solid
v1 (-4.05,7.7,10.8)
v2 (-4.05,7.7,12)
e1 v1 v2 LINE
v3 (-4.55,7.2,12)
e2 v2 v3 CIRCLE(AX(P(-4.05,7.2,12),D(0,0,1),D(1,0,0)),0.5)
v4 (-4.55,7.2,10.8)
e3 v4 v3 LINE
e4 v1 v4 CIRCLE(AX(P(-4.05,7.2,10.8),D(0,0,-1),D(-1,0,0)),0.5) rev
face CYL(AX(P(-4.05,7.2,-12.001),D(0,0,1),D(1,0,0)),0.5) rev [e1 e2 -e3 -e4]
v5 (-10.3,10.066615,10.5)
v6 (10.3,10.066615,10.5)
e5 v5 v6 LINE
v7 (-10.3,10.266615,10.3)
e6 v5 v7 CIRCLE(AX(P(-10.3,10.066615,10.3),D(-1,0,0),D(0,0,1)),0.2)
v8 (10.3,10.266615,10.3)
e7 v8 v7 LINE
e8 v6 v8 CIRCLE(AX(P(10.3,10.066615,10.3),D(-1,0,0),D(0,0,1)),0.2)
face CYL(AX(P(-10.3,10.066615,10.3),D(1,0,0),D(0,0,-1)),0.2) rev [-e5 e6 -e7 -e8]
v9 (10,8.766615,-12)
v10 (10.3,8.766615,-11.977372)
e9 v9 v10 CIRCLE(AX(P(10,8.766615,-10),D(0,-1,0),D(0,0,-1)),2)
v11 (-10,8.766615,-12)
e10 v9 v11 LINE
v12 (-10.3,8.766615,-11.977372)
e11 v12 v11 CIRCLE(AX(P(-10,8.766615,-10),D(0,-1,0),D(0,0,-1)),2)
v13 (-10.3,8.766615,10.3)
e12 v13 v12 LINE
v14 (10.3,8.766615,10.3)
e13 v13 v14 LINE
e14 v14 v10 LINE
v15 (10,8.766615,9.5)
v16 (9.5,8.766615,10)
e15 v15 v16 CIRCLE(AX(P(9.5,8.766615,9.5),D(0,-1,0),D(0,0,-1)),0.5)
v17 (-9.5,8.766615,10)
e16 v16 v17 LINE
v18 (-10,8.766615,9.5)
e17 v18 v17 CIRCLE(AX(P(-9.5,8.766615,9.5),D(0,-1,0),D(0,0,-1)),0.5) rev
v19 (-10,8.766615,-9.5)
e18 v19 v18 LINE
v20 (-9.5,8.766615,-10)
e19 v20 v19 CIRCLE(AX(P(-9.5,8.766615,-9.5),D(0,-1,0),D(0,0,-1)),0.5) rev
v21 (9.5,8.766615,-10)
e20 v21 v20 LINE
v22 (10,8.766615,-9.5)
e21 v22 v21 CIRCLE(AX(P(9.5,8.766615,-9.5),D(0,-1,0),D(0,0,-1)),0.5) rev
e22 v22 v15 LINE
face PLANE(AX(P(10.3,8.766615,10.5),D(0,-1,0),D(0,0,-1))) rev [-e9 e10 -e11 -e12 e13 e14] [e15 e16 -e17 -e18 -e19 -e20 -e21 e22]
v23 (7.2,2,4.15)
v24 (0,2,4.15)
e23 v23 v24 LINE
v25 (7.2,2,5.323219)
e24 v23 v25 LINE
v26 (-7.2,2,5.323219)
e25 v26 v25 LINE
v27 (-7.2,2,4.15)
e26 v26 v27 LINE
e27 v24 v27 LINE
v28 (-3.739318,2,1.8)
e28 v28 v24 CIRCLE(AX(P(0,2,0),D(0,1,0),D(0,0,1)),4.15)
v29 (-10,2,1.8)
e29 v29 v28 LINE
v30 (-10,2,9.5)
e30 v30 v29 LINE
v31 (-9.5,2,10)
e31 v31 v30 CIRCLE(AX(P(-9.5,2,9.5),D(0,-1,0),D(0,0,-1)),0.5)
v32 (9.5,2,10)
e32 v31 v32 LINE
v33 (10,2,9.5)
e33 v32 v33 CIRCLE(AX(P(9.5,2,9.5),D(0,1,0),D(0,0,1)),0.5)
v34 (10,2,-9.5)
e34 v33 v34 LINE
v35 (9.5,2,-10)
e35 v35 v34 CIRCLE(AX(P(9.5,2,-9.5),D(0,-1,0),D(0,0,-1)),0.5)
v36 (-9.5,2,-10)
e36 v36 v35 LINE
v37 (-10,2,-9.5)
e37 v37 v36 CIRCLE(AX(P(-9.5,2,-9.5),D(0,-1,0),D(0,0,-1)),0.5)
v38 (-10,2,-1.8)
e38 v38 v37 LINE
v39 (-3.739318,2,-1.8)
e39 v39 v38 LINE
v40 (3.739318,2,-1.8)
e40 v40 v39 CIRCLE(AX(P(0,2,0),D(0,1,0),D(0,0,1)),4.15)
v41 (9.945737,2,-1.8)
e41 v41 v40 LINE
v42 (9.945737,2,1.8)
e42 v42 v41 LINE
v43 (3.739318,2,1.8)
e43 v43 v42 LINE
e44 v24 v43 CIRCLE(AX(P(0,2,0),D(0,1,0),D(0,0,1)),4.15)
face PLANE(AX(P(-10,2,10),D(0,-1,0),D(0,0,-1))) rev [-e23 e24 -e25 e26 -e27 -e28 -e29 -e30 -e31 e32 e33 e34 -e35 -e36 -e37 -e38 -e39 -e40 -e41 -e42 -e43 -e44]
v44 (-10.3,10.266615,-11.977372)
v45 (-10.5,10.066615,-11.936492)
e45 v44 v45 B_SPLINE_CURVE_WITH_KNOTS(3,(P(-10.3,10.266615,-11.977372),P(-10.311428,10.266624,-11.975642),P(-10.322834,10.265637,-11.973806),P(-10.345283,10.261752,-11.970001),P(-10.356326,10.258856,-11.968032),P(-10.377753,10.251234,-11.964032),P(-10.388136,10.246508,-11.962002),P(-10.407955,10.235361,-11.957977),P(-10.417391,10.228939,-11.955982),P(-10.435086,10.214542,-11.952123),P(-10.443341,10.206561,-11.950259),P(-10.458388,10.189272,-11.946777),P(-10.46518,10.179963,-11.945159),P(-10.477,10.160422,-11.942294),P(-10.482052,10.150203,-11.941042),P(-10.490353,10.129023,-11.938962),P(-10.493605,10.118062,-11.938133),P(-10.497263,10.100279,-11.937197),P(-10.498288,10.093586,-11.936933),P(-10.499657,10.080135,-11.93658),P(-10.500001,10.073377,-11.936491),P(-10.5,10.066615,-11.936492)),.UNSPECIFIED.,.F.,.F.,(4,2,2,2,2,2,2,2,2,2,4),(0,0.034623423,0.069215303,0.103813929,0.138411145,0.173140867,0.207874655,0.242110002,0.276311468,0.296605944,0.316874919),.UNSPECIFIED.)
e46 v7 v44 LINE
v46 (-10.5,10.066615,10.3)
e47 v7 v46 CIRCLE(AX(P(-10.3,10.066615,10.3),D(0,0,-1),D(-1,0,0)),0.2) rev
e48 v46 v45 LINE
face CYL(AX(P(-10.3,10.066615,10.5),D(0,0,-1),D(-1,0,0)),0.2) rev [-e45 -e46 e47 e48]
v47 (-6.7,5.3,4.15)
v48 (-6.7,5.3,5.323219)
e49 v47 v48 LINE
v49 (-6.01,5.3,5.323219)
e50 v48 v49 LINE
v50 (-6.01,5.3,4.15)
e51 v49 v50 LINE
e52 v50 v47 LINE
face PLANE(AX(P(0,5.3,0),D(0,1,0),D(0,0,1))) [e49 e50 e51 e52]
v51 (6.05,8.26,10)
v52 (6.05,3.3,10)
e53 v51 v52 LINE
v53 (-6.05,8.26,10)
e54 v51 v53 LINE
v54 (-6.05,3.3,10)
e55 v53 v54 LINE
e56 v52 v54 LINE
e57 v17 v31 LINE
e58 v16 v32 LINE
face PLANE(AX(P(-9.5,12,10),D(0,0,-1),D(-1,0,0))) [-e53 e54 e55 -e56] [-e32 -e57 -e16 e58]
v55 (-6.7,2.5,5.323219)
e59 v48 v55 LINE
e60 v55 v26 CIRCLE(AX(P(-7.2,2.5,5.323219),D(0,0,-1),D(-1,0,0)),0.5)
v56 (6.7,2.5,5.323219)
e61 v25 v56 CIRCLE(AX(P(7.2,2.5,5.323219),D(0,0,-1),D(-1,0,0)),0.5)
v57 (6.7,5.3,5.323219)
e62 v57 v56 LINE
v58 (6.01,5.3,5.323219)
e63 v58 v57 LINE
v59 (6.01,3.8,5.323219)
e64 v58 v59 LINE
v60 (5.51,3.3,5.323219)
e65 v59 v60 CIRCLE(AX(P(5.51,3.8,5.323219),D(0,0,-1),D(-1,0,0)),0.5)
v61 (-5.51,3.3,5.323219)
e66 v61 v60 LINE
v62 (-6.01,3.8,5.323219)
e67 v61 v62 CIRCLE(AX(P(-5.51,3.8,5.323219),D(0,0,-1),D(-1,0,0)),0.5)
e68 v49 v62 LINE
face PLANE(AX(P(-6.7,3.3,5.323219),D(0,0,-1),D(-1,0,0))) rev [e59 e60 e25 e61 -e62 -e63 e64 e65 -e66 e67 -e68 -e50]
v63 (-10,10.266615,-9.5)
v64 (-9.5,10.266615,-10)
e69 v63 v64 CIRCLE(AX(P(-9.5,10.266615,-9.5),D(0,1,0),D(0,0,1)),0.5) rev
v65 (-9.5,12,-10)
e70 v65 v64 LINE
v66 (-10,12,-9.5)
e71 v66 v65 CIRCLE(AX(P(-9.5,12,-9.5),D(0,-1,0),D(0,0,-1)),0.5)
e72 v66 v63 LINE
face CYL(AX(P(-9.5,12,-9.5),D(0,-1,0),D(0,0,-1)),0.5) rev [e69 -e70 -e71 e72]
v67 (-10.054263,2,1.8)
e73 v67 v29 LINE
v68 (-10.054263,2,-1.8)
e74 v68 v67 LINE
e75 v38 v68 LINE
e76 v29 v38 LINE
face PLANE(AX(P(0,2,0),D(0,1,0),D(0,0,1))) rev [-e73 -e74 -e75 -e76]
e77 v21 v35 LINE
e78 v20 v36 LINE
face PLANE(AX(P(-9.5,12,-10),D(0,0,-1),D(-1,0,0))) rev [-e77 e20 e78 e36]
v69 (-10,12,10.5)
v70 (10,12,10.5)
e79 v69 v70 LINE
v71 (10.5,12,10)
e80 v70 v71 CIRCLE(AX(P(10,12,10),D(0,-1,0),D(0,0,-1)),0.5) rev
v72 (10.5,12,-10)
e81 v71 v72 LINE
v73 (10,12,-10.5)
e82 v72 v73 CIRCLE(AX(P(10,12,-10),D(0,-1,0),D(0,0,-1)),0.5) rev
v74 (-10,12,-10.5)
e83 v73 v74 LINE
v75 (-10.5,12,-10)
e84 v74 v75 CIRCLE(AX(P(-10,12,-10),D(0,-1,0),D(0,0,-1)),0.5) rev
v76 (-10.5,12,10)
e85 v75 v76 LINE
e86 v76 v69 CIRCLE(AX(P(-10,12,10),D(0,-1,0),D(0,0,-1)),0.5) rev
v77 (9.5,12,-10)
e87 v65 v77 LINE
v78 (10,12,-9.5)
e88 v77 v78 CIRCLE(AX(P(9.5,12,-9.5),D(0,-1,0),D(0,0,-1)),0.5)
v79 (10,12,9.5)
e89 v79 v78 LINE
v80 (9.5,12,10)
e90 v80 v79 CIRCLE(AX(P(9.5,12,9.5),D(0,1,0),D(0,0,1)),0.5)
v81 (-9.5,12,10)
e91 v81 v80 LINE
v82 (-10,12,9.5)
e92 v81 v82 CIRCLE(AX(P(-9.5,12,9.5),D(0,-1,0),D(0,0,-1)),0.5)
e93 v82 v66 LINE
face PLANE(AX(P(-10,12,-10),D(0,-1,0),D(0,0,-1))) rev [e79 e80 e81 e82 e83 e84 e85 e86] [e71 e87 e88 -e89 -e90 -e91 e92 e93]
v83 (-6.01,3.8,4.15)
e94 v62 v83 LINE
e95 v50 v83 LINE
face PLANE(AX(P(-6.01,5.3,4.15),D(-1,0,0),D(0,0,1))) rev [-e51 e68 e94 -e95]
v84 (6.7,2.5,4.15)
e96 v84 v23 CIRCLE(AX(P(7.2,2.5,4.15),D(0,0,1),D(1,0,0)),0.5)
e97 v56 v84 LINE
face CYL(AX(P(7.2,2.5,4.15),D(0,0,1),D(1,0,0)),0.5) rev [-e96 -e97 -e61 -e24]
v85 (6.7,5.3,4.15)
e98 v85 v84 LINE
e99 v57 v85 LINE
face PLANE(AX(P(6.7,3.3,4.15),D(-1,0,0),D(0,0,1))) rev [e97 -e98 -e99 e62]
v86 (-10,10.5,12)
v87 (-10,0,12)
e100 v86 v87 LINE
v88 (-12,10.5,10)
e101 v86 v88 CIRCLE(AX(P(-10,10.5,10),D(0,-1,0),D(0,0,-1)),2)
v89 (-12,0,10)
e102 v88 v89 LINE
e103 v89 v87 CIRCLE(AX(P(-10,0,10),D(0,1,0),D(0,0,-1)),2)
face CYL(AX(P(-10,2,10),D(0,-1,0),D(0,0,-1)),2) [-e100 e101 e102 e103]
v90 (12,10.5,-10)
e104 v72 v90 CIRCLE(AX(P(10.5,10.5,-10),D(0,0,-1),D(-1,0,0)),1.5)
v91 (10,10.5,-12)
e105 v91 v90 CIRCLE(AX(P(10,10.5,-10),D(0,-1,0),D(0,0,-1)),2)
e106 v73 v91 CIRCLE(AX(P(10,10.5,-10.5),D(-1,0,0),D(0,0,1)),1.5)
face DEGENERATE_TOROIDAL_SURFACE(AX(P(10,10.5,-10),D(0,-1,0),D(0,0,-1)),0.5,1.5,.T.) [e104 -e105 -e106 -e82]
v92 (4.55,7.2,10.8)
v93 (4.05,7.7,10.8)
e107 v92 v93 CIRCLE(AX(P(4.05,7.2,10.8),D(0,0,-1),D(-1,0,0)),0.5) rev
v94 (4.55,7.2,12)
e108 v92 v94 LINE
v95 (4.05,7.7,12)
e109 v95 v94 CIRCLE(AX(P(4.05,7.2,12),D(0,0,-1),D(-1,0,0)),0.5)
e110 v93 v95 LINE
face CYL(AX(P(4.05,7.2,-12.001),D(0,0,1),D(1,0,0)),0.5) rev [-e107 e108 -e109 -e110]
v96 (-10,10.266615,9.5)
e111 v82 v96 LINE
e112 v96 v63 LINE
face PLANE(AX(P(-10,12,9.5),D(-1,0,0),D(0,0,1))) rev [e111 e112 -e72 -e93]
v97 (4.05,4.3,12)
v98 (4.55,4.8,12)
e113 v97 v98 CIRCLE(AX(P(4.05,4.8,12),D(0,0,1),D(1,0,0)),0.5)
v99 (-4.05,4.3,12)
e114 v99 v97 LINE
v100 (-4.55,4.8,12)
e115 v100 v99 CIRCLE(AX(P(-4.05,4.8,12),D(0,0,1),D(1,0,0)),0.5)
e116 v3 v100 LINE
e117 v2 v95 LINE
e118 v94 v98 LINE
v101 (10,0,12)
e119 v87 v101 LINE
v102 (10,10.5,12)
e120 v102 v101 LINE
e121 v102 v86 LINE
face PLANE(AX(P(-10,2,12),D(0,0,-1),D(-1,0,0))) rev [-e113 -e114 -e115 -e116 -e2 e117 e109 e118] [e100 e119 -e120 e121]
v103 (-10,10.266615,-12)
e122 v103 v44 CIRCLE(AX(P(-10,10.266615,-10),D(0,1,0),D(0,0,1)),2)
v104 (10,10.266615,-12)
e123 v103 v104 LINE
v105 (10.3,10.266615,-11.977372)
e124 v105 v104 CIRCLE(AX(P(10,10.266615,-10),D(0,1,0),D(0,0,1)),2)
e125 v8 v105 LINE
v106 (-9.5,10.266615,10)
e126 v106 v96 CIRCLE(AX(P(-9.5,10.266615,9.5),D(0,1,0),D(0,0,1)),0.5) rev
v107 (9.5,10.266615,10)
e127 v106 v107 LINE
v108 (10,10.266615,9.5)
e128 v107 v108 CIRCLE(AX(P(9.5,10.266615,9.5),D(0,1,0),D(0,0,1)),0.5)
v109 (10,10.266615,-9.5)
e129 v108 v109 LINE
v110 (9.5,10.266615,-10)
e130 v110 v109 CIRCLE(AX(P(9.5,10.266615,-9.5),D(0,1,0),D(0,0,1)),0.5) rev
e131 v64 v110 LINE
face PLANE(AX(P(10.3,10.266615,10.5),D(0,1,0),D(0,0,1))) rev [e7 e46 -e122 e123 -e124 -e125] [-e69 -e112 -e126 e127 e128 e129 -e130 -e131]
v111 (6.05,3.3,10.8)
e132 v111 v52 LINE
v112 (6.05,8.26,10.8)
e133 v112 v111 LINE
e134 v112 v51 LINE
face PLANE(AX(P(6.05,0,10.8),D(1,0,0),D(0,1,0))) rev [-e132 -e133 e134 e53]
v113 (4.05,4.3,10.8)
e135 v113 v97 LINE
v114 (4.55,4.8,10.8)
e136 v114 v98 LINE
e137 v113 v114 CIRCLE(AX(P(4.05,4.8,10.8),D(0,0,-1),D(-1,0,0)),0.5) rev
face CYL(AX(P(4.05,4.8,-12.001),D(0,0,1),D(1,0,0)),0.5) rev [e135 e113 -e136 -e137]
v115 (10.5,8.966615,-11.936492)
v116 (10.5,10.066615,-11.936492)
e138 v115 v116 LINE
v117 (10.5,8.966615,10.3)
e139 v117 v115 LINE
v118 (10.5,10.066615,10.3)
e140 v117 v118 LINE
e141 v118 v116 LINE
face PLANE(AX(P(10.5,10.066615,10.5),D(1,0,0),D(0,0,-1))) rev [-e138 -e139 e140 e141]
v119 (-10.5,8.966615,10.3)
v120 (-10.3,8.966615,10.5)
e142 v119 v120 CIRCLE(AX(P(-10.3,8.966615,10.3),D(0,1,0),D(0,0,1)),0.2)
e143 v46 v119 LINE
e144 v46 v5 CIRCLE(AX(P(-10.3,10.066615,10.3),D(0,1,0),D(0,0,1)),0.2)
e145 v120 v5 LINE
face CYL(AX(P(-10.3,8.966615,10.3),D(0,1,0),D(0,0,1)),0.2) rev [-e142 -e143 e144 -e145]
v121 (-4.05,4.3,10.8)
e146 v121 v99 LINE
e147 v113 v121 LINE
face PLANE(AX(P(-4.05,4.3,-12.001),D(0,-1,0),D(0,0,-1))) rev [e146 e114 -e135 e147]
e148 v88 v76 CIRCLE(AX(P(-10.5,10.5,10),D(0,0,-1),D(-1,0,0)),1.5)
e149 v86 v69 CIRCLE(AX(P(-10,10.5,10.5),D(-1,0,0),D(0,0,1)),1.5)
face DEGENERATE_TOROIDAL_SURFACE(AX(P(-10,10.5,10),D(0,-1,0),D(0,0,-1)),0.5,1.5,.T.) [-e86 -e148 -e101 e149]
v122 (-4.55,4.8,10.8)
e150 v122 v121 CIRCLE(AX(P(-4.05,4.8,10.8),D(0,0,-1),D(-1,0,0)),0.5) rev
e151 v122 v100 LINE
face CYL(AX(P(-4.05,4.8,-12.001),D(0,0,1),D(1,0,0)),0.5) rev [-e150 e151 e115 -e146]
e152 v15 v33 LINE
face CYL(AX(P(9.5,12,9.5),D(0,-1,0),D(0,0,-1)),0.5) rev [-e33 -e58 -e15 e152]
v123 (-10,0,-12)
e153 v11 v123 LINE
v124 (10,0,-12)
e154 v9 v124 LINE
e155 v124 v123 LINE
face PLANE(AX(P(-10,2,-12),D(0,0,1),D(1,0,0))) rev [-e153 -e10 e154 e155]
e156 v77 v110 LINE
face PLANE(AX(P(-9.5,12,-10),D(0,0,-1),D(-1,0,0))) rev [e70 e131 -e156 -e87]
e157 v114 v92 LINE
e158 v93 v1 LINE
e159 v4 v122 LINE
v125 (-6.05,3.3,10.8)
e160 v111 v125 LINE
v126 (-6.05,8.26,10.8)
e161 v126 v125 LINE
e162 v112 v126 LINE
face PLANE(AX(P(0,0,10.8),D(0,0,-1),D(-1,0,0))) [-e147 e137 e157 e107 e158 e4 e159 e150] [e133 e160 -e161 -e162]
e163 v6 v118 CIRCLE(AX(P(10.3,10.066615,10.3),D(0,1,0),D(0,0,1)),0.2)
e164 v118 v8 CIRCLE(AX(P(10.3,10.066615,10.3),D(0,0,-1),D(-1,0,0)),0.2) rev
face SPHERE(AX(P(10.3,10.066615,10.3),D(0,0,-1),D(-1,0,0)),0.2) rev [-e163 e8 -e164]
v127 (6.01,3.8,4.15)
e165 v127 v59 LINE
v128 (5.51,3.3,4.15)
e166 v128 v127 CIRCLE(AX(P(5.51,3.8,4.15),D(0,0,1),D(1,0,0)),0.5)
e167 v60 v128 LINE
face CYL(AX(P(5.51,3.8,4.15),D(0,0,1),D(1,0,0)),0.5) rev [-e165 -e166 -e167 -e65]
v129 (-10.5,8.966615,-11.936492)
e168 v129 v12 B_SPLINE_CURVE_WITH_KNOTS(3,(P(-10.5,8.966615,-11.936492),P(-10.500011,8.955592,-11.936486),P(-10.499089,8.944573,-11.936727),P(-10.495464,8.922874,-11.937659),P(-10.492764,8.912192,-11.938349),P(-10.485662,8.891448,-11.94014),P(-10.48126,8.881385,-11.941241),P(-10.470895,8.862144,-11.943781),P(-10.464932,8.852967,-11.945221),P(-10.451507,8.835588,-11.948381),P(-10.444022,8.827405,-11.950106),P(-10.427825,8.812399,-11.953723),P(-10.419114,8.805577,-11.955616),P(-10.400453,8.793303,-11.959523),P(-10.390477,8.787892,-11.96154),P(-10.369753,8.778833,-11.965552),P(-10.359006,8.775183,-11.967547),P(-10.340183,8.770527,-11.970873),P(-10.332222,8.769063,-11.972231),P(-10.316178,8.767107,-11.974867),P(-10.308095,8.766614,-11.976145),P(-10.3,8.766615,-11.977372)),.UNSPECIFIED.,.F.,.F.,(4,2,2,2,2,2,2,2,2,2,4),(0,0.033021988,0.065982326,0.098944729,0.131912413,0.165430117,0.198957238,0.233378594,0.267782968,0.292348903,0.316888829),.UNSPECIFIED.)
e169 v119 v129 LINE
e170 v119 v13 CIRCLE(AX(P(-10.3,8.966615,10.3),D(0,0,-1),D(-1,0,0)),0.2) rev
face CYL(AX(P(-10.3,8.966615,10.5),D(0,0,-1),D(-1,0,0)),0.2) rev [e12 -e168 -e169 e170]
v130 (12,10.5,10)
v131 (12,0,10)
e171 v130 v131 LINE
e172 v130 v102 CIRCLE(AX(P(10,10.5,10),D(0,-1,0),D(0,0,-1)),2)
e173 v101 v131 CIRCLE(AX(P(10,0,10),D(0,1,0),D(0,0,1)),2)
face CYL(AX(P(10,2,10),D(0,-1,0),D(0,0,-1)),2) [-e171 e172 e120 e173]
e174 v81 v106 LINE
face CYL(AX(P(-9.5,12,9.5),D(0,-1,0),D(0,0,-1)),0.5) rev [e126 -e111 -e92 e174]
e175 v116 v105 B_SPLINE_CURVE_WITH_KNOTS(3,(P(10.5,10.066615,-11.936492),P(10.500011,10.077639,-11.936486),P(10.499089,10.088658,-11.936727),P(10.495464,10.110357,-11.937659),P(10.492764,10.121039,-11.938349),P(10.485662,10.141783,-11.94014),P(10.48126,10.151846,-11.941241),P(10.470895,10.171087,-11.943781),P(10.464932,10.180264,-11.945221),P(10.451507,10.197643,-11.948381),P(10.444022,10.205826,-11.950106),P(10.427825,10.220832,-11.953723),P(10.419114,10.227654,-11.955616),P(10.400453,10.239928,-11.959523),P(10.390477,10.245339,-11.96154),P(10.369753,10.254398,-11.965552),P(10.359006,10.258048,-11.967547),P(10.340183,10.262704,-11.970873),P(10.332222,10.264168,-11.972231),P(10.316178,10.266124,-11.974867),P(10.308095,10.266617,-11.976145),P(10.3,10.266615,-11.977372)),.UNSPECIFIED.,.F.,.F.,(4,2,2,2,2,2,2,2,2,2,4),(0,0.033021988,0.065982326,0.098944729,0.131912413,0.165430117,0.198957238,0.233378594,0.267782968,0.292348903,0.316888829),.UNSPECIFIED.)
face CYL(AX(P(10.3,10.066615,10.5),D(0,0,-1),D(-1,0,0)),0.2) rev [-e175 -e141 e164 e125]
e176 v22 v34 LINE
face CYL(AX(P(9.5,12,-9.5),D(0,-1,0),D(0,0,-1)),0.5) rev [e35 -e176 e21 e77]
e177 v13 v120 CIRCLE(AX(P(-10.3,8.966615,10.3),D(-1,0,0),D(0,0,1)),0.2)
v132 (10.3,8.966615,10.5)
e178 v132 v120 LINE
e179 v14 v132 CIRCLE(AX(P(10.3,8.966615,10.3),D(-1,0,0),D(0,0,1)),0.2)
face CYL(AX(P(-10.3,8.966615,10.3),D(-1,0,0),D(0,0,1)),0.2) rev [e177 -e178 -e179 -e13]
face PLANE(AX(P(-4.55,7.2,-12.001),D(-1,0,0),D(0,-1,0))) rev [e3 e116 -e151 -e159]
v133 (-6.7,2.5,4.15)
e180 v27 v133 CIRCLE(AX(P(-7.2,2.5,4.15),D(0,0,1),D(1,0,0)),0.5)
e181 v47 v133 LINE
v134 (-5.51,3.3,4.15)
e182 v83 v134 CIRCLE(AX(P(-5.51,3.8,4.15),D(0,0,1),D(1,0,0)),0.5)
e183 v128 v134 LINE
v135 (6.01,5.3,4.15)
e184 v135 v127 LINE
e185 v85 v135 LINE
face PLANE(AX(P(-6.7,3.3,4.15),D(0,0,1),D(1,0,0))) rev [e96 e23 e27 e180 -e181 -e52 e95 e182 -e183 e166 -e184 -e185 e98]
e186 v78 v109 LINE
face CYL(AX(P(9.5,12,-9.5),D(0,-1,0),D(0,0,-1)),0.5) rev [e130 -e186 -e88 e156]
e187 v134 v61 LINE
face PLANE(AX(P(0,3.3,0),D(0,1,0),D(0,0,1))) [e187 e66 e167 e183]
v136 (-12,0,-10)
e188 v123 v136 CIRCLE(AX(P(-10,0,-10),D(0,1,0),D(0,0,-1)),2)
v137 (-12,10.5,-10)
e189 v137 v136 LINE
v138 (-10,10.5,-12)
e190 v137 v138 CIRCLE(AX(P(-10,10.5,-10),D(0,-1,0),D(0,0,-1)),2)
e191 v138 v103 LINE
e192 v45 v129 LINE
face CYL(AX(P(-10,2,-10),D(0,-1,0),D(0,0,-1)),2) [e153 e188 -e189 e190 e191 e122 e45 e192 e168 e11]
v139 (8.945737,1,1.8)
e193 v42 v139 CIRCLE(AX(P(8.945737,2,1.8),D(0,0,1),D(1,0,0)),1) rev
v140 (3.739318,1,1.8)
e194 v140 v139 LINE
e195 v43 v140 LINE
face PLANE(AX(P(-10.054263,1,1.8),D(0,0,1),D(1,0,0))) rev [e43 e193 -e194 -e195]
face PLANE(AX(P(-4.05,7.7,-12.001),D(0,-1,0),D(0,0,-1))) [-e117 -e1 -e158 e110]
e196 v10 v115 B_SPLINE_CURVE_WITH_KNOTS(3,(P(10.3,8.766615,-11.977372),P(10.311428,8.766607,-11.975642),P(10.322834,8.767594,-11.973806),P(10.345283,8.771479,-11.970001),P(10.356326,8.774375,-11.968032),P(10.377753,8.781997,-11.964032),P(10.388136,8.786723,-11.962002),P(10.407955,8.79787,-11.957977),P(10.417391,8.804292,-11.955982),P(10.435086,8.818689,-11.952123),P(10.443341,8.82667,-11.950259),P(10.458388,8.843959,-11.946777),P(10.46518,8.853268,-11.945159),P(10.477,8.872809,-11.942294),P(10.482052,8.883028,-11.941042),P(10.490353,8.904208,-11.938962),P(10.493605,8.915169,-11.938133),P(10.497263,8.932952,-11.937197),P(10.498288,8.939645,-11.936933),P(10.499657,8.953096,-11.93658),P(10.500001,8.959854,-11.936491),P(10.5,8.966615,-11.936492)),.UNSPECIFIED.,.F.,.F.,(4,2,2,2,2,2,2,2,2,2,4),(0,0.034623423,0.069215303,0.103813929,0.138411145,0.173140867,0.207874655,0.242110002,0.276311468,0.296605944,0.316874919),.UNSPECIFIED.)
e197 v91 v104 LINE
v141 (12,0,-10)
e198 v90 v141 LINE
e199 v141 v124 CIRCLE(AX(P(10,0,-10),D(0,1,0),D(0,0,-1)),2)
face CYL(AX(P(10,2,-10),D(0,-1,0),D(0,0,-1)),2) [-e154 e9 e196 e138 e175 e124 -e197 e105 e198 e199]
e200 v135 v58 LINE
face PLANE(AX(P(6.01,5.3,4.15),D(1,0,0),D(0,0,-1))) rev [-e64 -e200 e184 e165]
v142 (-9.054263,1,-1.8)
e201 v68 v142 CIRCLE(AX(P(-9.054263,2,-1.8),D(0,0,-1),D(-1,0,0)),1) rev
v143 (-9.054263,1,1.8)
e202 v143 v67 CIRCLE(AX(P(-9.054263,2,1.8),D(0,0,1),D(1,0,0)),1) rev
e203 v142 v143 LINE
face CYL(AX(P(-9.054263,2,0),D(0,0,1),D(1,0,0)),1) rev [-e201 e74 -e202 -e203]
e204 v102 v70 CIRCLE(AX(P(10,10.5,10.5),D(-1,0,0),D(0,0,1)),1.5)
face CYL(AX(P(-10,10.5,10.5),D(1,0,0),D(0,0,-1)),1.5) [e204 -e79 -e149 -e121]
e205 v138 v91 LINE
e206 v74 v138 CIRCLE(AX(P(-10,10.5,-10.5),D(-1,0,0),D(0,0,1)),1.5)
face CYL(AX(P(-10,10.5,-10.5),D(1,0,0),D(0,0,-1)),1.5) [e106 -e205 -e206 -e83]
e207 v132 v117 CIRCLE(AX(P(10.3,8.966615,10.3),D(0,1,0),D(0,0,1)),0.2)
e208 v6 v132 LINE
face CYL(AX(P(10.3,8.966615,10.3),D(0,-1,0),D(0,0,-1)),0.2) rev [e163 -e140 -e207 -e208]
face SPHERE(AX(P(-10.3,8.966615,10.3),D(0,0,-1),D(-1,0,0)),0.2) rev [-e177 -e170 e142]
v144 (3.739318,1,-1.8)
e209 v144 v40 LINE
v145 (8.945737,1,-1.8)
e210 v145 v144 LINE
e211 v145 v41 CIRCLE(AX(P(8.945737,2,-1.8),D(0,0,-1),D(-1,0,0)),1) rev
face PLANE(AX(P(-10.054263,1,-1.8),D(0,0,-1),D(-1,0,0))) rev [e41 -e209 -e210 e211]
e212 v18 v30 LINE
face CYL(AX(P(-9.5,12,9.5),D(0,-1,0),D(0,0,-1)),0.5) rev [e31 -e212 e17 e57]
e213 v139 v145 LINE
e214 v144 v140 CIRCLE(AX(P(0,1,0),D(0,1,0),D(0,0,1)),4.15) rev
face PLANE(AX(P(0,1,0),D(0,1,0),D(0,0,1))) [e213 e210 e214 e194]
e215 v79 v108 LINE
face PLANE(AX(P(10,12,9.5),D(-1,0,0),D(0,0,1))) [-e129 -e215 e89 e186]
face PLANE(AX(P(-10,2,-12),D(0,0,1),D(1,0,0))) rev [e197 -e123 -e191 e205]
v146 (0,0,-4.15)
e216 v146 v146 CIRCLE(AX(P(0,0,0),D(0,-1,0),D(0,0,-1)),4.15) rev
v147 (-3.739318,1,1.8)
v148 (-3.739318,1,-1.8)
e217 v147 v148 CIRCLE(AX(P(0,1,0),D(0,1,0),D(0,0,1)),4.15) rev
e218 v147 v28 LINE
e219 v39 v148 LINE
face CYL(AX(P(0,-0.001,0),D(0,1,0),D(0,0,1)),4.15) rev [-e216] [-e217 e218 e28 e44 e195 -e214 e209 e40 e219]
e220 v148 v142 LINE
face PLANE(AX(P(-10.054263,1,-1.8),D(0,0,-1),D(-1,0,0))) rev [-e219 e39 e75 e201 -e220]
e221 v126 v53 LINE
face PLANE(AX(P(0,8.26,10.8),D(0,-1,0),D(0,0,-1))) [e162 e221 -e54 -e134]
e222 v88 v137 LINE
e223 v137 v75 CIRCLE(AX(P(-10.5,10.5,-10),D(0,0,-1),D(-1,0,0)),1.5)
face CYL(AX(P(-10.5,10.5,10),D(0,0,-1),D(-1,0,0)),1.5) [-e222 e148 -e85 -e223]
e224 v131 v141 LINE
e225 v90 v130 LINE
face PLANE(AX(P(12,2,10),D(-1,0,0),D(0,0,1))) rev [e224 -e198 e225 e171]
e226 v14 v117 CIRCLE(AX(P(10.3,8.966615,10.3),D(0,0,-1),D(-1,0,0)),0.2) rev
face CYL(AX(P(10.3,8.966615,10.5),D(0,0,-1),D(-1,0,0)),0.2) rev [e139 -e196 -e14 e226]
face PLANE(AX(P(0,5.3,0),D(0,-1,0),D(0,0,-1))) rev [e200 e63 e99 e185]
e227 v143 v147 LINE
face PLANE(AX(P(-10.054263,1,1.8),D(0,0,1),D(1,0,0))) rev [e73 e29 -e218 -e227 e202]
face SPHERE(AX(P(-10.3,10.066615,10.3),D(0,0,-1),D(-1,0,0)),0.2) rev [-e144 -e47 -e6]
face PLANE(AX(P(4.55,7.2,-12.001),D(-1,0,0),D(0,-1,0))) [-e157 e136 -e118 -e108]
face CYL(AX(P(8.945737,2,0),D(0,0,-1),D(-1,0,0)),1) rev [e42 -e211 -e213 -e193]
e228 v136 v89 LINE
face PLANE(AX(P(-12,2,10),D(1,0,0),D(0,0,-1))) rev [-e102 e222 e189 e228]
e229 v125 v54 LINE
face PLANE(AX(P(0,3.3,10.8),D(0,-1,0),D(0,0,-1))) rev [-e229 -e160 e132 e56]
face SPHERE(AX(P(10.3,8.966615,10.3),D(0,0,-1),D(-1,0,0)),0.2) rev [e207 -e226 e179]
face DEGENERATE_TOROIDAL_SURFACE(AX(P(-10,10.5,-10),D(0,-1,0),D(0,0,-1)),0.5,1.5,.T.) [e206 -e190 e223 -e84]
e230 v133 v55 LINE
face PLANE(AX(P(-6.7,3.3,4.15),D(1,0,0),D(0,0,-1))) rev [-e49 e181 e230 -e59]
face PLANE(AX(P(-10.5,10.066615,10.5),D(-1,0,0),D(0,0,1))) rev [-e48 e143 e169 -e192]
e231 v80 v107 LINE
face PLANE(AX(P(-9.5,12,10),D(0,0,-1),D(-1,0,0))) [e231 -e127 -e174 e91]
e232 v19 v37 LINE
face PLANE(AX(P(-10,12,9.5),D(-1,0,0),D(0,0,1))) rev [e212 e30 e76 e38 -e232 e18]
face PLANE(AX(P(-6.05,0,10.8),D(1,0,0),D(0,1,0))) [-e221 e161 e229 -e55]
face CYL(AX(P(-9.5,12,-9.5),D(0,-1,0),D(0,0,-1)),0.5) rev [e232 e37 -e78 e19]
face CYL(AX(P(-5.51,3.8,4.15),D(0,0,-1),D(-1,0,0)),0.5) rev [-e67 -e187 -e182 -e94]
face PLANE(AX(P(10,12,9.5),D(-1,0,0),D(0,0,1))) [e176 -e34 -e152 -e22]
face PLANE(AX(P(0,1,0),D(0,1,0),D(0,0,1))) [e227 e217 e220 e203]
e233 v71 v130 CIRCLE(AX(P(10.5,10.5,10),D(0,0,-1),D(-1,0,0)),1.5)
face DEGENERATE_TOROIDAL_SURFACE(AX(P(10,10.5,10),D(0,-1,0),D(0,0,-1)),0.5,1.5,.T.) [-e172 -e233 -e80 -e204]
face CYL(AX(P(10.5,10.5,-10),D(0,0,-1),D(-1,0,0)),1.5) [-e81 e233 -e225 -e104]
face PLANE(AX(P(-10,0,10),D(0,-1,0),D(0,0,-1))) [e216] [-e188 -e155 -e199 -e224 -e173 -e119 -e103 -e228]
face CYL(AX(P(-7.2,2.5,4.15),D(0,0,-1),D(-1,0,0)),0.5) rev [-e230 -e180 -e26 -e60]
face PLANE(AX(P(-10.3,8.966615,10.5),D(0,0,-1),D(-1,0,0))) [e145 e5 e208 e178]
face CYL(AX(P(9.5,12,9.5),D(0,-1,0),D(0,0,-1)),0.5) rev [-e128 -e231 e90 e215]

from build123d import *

# Parameters (mm, degrees)
BOSS_EXTRUDE2_DEPTH = 2
BOSS_EXTRUDE3_DEPTH = 10
CUT_EXTRUDE1_REACH  = 31.394
CUT_EXTRUDE2_REACH  = 21.698
SKETCH5_R           = 4.15
SKETCH6_W           = 20
SKETCH6_H           = 3.6
CUT_EXTRUDE3_DEPTH  = 1
FILLET1_R           = 1
CUT_EXTRUDE4_START  = -0.8
CUT_EXTRUDE4_DEPTH  = 0.8
SKETCH8_W           = 13.4
SKETCH8_H           = 1.173218526
BOSS_EXTRUDE4_DEPTH = 1.3
SKETCH10_W          = 0.69
SKETCH10_H          = 1.173218526
BOSS_EXTRUDE5_DEPTH = 2
FILLET2_R           = 0.5
FILLET6_R           = 0.5
FILLET8_R           = 1.5
CUT_EXTRUDE6_DEPTH  = 22.5
FILLET9_R           = 0.2


with BuildPart() as part:
    # Sketch2 → Boss-Extrude2 (new body)
    with BuildSketch(Plane(origin=(0, 0, 0), x_dir=(1, 0, 0), z_dir=(0, 1, 0))):
        with BuildLine():
            Line((-10, -12), (10, -12))
            ThreePointArc((10, -12), (11.414213562, -11.414213562), (12, -10))
            Line((12, -10), (12, 10))
            ThreePointArc((12, 10), (11.414213562, 11.414213562), (10, 12))
            Line((10, 12), (-10, 12))
            ThreePointArc((-10, 12), (-11.414213562, 11.414213562), (-12, 10))
            Line((-12, 10), (-12, -10))
            ThreePointArc((-12, -10), (-11.414213562, -11.414213562), (-10, -12))
        make_face()
    extrude(amount=BOSS_EXTRUDE2_DEPTH)

    # Sketch3 → Boss-Extrude3 (add)
    with BuildSketch(Plane(origin=(0, 2, 0), x_dir=(1, 0, 0), z_dir=(0, 1, 0))):
        with BuildLine():
            Line((-10, -12), (10, -12))
            ThreePointArc((10, -12), (11.414213562, -11.414213562), (12, -10))
            Line((12, -10), (12, 10))
            ThreePointArc((12, 10), (11.414213562, 11.414213562), (10, 12))
            Line((10, 12), (-10, 12))
            ThreePointArc((-10, 12), (-11.414213562, 11.414213562), (-12, 10))
            Line((-12, 10), (-12, -10))
            ThreePointArc((-12, -10), (-11.414213562, -11.414213562), (-10, -12))
        make_face()
        with BuildLine():
            Line((-9.5, -10), (9.5, -10))
            ThreePointArc((9.5, -10), (9.853553391, -9.853553391), (10, -9.5))
            Line((10, -9.5), (10, 9.5))
            ThreePointArc((10, 9.5), (9.853553391, 9.853553391), (9.5, 10))
            Line((9.5, 10), (-9.5, 10))
            ThreePointArc((-9.5, 10), (-9.853553391, 9.853553391), (-10, 9.5))
            Line((-10, 9.5), (-10, -9.5))
            ThreePointArc((-10, -9.5), (-9.853553391, -9.853553391), (-9.5, -10))
        make_face(mode=Mode.SUBTRACT)
    extrude(amount=BOSS_EXTRUDE3_DEPTH)

    # Sketch4 → Cut-Extrude1 (cut, up to next)
    with BuildSketch(Plane.XY.offset(12), mode=Mode.PRIVATE) as cut_extrude1_sk1:
        with BuildLine():
            Line((-4.05, 7.7), (4.05, 7.7))
            ThreePointArc((4.05, 7.7), (4.403553391, 7.553553391), (4.55, 7.2))
            Line((4.55, 7.2), (4.55, 4.8))
            ThreePointArc((4.55, 4.8), (4.403553391, 4.446446609), (4.05, 4.3))
            Line((4.05, 4.3), (-4.05, 4.3))
            ThreePointArc((-4.05, 4.3), (-4.403553391, 4.446446609), (-4.55, 4.8))
            Line((-4.55, 4.8), (-4.55, 7.2))
            ThreePointArc((-4.55, 7.2), (-4.403553391, 7.553553391), (-4.05, 7.7))
        make_face()
    cut_extrude1_tool1 = extrude(cut_extrude1_sk1.sketch, amount=-CUT_EXTRUDE1_REACH, mode=Mode.PRIVATE) & part.part
    add(cut_extrude1_tool1.solids().sort_by_distance((0, 6, 12))[0], mode=Mode.SUBTRACT)

    # Sketch5 → Cut-Extrude2 (cut, up to next)
    with BuildSketch(Plane(origin=(0, 2, 0), x_dir=(1, 0, 0), z_dir=(0, 1, 0)), mode=Mode.PRIVATE) as cut_extrude2_sk1:
        with Locations(Location((0, 0, 0), (0, 0, 270))):
            Circle(SKETCH5_R)
    cut_extrude2_tool1 = extrude(cut_extrude2_sk1.sketch, amount=-CUT_EXTRUDE2_REACH, mode=Mode.PRIVATE) & part.part
    add(cut_extrude2_tool1.solids().sort_by_distance((0, 2, 0))[0], mode=Mode.SUBTRACT)

    # Sketch6 → Cut-Extrude3 (cut)
    with BuildSketch(Plane(origin=(0, 2, 0), x_dir=(1, 0, 0), z_dir=(0, 1, 0))):
        with Locations((-0.054263112, 0)):
            Rectangle(SKETCH6_W, SKETCH6_H)
    extrude(amount=-CUT_EXTRUDE3_DEPTH, mode=Mode.SUBTRACT)

    # Fillet1
    fillet1_edges = [part.edges().sort_by_distance(p)[0] for p in [
        (9.945736888, 1, 0),
        (-10.054263112, 1, 0),
    ]]
    fillet(fillet1_edges, radius=FILLET1_R - 0.0001)  # a hair under: the kernel refuses the full size

    # Sketch7 → Cut-Extrude4 (cut)
    with BuildSketch(Plane(origin=(0, 0, 10), x_dir=(-1, 0, 0), z_dir=(0, 0, -1)).offset(CUT_EXTRUDE4_START)):
        with BuildLine():
            Line((-6.05, 8.26), (-6.05, 4.3))
            Line((-6.05, 4.3), (-4.05, 4.3))
            ThreePointArc((-4.05, 4.3), (-4.403553391, 4.446446609), (-4.55, 4.8))
            Line((-4.55, 4.8), (-4.55, 7.2))
            ThreePointArc((-4.55, 7.2), (-4.403553391, 7.553553391), (-4.05, 7.7))
            Line((-4.05, 7.7), (4.05, 7.7))
            ThreePointArc((4.05, 7.7), (4.403553391, 7.553553391), (4.55, 7.2))
            Line((4.55, 7.2), (4.55, 4.8))
            ThreePointArc((4.55, 4.8), (4.403553391, 4.446446609), (4.05, 4.3))
            Line((4.05, 4.3), (6.05, 4.3))
            Line((6.05, 4.3), (6.05, 8.26))
            Line((6.05, 8.26), (-6.05, 8.26))
        make_face()
        Polygon((-6.05, 4.3), (-6.05, 3.3), (6.05, 3.3), (6.05, 4.3), (4.05, 4.3), (-4.05, 4.3), align=None)
    extrude(amount=CUT_EXTRUDE4_DEPTH, mode=Mode.SUBTRACT)

    # Sketch8 → Boss-Extrude4 (add)
    with BuildSketch(Plane(origin=(0, 2, 0), x_dir=(1, 0, 0), z_dir=(0, 1, 0))):
        with Locations((0, -4.736609263)):
            Rectangle(SKETCH8_W, SKETCH8_H)
    extrude(amount=BOSS_EXTRUDE4_DEPTH)

    # Sketch10 → Boss-Extrude5 (add)
    with BuildSketch(Plane(origin=(0, 3.3, 0), x_dir=(1, 0, 0), z_dir=(0, 1, 0))):
        with Locations((6.355, -4.736609263)):
            Rectangle(SKETCH10_W, SKETCH10_H)
        with Locations((-6.355, -4.736609263)):
            Rectangle(SKETCH10_W, SKETCH10_H)
    extrude(amount=BOSS_EXTRUDE5_DEPTH)

    # Fillet2
    fillet2_edges = [part.edges().sort_by_distance(p)[0] for p in [
        (-6.01, 3.3, 4.736609263),
        (6.01, 3.3, 4.736609263),
    ]]
    fillet(fillet2_edges, radius=FILLET2_R)

    # Fillet6
    fillet6_edges = [part.edges().sort_by_distance(p)[0] for p in [
        (6.7, 2, 4.736609263),
        (-6.7, 2, 4.736609263),
    ]]
    fillet(fillet6_edges, radius=FILLET6_R)

    # Fillet8
    fillet8_edges = [part.edges().sort_by_distance(p)[0] for p in [
        (-12, 12, 0),
        (-11.414213562, 12, 11.414213562),
        (11.414213562, 12, -11.414213562),
        (0, 12, -12),
        (-11.414213562, 12, -11.414213562),
        (0, 12, 12),
        (11.414213562, 12, 11.414213562),
        (12, 12, 0),
    ]]
    fillet(fillet8_edges, radius=FILLET8_R)

    # Sketch21 → Cut-Extrude6 (cut)
    with BuildSketch(Plane(origin=(0, 0, -12), x_dir=(-1, 0, 0), z_dir=(0, 0, -1))):
        with BuildLine():
            Line((-10.3, 10.26661549), (10.3, 10.26661549))
            ThreePointArc((10.3, 10.26661549), (10.441421356, 10.208036847), (10.5, 10.06661549))
            Line((10.5, 10.06661549), (10.5, 8.96661549))
            ThreePointArc((10.5, 8.96661549), (10.441421356, 8.825194134), (10.3, 8.76661549))
            Line((10.3, 8.76661549), (-10.3, 8.76661549))
            ThreePointArc((-10.3, 8.76661549), (-10.441421356, 8.825194134), (-10.5, 8.96661549))
            Line((-10.5, 8.96661549), (-10.5, 10.06661549))
            ThreePointArc((-10.5, 10.06661549), (-10.441421356, 10.208036847), (-10.3, 10.26661549))
        make_face()
    extrude(amount=-CUT_EXTRUDE6_DEPTH, mode=Mode.SUBTRACT)

    # Fillet9
    fillet9_edges = [part.edges().sort_by_distance(p)[0] for p in [
        (10.441421356, 8.825194134, 10.5),
        (10.5, 9.51661549, 10.5),
        (10.441421356, 10.208036847, 10.5),
        (-10.441421356, 8.825194134, 10.5),
        (-10.441421356, 10.208036847, 10.5),
        (-10.5, 9.51661549, 10.5),
        (0, 8.76661549, 10.5),
        (0, 10.26661549, 10.5),
    ]]
    fillet(fillet9_edges, radius=FILLET9_R)


solid = part.part
